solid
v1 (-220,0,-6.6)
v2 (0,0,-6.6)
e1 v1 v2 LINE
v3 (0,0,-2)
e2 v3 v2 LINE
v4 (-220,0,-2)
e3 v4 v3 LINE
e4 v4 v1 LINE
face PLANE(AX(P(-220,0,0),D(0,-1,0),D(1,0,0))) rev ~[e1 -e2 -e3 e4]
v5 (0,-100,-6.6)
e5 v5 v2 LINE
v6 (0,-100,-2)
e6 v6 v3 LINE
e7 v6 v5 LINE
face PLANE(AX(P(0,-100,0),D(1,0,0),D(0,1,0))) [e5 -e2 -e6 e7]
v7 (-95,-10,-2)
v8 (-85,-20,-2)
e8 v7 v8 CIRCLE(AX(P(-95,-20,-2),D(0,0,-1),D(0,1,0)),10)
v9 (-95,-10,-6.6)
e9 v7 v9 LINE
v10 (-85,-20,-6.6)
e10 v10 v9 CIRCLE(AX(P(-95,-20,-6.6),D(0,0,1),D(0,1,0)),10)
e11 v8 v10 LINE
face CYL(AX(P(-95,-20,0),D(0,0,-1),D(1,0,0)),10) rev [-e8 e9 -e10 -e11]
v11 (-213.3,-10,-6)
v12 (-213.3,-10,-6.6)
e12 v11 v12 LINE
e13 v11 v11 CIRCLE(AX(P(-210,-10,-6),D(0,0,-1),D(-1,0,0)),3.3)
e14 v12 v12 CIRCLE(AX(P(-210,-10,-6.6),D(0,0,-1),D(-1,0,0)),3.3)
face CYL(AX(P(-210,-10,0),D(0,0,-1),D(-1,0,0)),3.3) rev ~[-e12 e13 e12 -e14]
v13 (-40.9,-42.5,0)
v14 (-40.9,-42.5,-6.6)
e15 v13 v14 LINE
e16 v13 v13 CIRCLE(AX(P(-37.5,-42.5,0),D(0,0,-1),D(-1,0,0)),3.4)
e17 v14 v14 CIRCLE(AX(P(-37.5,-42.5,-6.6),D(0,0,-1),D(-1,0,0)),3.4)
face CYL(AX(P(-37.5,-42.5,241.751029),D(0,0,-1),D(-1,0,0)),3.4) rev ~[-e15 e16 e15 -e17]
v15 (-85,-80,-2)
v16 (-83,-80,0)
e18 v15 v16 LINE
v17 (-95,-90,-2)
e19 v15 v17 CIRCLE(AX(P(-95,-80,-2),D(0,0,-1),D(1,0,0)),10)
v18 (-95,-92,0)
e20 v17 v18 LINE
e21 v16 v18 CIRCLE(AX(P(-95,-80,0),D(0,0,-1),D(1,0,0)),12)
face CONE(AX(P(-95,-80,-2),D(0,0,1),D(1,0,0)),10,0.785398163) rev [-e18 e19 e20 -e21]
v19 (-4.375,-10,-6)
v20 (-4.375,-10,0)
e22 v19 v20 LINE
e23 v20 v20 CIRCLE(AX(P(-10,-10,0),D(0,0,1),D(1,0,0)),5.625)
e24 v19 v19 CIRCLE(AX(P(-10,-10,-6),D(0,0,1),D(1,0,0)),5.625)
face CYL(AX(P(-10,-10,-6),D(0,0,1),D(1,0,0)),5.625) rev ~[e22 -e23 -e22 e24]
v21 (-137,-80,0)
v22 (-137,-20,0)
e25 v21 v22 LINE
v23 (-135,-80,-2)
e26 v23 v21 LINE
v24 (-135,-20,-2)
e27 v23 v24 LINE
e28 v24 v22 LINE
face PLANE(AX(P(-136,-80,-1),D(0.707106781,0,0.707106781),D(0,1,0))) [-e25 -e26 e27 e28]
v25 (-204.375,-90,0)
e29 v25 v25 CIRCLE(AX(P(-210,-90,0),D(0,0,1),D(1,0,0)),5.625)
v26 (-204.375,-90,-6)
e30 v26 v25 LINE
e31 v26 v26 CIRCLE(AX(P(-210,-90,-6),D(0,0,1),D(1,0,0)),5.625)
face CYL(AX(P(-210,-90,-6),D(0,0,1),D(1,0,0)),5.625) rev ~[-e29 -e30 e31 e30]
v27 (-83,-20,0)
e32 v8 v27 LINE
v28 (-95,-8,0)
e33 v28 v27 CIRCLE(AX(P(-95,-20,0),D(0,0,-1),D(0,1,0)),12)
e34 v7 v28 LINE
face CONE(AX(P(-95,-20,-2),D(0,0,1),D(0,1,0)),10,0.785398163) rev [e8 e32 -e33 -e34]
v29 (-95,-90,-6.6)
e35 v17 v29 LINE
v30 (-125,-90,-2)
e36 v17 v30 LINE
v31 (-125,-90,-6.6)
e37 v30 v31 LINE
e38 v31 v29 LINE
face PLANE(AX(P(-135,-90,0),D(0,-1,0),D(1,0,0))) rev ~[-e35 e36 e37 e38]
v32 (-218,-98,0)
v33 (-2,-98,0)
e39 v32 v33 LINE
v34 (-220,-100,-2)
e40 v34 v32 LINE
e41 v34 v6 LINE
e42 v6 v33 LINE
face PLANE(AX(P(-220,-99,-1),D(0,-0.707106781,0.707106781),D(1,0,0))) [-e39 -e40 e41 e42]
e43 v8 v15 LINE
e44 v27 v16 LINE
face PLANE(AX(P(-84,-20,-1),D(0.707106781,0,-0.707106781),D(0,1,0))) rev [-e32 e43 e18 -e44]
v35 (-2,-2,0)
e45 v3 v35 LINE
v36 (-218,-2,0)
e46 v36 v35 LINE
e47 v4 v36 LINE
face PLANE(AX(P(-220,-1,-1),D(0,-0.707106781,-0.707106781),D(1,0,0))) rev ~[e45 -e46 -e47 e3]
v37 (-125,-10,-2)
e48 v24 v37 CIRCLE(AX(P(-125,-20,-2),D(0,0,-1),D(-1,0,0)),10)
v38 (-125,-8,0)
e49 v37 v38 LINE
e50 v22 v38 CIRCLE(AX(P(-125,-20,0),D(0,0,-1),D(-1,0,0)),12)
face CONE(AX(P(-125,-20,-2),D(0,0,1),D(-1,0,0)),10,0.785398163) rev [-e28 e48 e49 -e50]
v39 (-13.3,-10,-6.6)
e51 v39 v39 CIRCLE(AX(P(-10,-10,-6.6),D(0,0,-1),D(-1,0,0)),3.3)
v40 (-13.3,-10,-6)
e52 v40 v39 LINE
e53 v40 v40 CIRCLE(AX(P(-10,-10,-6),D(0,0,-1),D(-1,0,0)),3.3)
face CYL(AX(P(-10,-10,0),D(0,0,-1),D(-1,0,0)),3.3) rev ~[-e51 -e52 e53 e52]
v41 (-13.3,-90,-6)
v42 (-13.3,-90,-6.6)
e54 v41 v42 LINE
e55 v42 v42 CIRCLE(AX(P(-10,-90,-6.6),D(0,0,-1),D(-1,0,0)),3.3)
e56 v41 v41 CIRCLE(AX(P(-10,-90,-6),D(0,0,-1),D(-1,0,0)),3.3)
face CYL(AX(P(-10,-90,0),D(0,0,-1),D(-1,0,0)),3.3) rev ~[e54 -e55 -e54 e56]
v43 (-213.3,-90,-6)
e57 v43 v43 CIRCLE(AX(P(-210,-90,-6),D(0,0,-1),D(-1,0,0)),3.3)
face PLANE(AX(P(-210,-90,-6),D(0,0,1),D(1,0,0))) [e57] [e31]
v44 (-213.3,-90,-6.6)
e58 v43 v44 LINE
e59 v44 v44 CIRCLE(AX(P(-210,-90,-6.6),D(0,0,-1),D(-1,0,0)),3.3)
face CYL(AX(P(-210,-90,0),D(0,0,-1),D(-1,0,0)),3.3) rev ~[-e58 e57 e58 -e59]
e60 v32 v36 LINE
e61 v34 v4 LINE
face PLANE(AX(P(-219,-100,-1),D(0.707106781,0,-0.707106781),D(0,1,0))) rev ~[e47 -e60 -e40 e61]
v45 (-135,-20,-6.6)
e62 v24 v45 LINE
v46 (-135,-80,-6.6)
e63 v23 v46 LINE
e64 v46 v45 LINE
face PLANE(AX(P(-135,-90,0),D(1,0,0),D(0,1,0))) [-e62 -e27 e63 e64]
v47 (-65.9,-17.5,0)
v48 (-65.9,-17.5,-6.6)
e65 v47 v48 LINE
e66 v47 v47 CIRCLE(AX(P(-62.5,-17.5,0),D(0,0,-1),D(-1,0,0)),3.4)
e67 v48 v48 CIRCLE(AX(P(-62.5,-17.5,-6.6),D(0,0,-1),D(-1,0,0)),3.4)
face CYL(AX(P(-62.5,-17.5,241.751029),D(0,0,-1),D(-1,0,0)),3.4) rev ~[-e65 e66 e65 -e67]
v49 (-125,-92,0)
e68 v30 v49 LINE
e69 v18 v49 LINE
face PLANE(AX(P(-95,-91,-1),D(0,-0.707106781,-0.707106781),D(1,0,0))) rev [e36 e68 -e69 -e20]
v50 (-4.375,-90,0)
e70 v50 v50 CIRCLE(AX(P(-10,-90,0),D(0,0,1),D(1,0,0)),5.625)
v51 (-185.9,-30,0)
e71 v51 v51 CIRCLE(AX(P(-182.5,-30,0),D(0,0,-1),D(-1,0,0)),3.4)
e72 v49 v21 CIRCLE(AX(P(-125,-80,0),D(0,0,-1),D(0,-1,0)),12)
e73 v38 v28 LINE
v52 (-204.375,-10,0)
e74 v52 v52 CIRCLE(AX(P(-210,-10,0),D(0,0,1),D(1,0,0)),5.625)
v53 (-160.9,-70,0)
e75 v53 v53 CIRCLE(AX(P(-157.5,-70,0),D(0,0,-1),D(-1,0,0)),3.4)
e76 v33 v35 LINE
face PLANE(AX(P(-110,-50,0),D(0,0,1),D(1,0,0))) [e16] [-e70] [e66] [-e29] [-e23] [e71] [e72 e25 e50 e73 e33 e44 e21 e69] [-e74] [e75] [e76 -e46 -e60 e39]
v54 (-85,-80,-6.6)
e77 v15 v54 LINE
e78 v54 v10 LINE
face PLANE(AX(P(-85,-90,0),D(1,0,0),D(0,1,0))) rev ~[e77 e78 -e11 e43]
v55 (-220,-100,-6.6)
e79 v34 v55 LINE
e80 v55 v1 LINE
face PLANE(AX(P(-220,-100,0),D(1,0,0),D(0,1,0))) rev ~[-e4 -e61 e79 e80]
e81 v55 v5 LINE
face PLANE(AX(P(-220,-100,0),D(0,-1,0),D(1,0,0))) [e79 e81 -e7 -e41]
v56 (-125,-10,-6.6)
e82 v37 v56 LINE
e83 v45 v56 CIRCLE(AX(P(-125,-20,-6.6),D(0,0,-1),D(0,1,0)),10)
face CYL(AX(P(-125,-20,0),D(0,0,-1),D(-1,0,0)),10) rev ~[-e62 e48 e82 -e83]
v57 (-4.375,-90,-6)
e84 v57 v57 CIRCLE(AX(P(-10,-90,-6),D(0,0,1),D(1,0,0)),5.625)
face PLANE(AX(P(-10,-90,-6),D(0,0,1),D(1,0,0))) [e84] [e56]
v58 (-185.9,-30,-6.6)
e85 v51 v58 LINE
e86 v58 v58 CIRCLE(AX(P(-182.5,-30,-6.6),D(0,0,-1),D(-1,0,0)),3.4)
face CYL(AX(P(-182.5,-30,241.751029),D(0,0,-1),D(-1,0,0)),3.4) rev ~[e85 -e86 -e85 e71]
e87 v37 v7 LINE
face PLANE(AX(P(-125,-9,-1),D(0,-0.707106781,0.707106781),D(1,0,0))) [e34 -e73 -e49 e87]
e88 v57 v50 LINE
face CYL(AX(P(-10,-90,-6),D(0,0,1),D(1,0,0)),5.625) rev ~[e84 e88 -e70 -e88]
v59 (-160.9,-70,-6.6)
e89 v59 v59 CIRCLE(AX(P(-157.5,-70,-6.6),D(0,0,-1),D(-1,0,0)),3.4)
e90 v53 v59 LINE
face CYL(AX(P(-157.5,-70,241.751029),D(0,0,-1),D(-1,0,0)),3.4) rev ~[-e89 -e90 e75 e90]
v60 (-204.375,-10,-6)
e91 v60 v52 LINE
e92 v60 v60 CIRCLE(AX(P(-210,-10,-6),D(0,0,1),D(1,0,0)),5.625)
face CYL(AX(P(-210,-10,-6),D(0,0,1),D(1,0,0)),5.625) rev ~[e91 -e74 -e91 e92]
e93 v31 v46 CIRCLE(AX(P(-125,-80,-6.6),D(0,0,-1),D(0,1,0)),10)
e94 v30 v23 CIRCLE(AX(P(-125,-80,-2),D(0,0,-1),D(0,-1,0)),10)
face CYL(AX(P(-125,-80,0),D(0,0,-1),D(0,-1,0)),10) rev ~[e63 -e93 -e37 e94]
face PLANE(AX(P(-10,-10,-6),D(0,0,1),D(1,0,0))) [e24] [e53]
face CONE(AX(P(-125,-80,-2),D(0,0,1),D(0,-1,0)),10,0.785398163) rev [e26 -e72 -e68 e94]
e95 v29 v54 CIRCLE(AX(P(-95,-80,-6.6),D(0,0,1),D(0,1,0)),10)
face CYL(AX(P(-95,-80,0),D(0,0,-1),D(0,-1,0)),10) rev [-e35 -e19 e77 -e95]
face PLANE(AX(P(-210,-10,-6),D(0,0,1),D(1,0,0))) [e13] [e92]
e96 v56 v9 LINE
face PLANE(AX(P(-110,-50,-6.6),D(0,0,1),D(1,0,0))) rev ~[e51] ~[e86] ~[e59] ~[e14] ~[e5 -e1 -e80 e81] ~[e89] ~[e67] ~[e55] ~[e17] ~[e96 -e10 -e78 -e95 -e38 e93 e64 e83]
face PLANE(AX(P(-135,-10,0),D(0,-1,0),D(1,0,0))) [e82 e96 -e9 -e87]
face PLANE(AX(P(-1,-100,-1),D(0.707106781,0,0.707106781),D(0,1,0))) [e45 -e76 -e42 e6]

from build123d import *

# Parameters (mm, degrees)
F0_W           = 220
F0_H           = 100
F0_R           = 0.625
F0_W_2         = 50
F0_H_2         = 80
F0_R_2         = 0.6265
F1_DEPTH       = 6.6
F2_SIZE2       = 2
F2_SIZE        = 2
F3_D           = 6.8
F4_D           = 6.6
F4_CBORE_D     = 11.25
F4_CBORE_DEPTH = 6
F5_R           = 10
F6_SIZE2       = 2
F6_SIZE        = 2


# Not quite as in the source:
# - a feature names something its author has since deleted; it is built from what else it names


with BuildPart() as f1:
    # F0 (on Top) → F1 (new body)
    with BuildSketch(Plane.XY):
        with Locations((-110, -50)):
            Rectangle(F0_W, F0_H)
        with Locations((-157.5, -70)):
            Circle(F0_R, mode=Mode.SUBTRACT)
        with Locations((-182.5, -30)):
            Circle(F0_R, mode=Mode.SUBTRACT)
        with Locations((-110, -50)):
            Rectangle(F0_W_2, F0_H_2, mode=Mode.SUBTRACT)
        with Locations((-37.5, -42.5)):
            Circle(F0_R_2, mode=Mode.SUBTRACT)
        with Locations((-62.5, -17.5)):
            Circle(F0_R, mode=Mode.SUBTRACT)
    extrude(amount=-F1_DEPTH)

    # F2
    f2_edges = [f1.edges().sort_by_distance(p)[0] for p in [
        (-110, -100, 0),
        (0, -50, 0),
        (-110, 0, 0),
        (-220, -50, 0),
    ]]
    chamfer(f2_edges, length=F2_SIZE, length2=F2_SIZE2)

    # F3 (through all)
    with Locations(Plane.XY):
        with Locations((-182.5, -30), (-157.5, -70), (-37.5, -42.5), (-62.5, -17.5)):
            Hole(F3_D / 2)

    # F4 (through all)
    with Locations(Plane.XY):
        with Locations((-210, -10), (-210, -90), (-10, -90), (-10, -10)):
            CounterBoreHole(F4_D / 2, F4_CBORE_D / 2, F4_CBORE_DEPTH)

    # F5
    f5_edges = [f1.edges().sort_by_distance(p)[0] for p in [
        (-135, -10, -3.3),
        (-85, -10, -3.3),
        (-135, -90, -3.3),
        (-85, -90, -3.3),
    ]]
    fillet(f5_edges, radius=F5_R)

    # F6
    f6_edges = [f1.edges().sort_by_distance(p)[0] for p in [
        (-135, -50, 0),
    ]]
    chamfer(f6_edges, length=F6_SIZE, length2=F6_SIZE2)


solid = f1.part
